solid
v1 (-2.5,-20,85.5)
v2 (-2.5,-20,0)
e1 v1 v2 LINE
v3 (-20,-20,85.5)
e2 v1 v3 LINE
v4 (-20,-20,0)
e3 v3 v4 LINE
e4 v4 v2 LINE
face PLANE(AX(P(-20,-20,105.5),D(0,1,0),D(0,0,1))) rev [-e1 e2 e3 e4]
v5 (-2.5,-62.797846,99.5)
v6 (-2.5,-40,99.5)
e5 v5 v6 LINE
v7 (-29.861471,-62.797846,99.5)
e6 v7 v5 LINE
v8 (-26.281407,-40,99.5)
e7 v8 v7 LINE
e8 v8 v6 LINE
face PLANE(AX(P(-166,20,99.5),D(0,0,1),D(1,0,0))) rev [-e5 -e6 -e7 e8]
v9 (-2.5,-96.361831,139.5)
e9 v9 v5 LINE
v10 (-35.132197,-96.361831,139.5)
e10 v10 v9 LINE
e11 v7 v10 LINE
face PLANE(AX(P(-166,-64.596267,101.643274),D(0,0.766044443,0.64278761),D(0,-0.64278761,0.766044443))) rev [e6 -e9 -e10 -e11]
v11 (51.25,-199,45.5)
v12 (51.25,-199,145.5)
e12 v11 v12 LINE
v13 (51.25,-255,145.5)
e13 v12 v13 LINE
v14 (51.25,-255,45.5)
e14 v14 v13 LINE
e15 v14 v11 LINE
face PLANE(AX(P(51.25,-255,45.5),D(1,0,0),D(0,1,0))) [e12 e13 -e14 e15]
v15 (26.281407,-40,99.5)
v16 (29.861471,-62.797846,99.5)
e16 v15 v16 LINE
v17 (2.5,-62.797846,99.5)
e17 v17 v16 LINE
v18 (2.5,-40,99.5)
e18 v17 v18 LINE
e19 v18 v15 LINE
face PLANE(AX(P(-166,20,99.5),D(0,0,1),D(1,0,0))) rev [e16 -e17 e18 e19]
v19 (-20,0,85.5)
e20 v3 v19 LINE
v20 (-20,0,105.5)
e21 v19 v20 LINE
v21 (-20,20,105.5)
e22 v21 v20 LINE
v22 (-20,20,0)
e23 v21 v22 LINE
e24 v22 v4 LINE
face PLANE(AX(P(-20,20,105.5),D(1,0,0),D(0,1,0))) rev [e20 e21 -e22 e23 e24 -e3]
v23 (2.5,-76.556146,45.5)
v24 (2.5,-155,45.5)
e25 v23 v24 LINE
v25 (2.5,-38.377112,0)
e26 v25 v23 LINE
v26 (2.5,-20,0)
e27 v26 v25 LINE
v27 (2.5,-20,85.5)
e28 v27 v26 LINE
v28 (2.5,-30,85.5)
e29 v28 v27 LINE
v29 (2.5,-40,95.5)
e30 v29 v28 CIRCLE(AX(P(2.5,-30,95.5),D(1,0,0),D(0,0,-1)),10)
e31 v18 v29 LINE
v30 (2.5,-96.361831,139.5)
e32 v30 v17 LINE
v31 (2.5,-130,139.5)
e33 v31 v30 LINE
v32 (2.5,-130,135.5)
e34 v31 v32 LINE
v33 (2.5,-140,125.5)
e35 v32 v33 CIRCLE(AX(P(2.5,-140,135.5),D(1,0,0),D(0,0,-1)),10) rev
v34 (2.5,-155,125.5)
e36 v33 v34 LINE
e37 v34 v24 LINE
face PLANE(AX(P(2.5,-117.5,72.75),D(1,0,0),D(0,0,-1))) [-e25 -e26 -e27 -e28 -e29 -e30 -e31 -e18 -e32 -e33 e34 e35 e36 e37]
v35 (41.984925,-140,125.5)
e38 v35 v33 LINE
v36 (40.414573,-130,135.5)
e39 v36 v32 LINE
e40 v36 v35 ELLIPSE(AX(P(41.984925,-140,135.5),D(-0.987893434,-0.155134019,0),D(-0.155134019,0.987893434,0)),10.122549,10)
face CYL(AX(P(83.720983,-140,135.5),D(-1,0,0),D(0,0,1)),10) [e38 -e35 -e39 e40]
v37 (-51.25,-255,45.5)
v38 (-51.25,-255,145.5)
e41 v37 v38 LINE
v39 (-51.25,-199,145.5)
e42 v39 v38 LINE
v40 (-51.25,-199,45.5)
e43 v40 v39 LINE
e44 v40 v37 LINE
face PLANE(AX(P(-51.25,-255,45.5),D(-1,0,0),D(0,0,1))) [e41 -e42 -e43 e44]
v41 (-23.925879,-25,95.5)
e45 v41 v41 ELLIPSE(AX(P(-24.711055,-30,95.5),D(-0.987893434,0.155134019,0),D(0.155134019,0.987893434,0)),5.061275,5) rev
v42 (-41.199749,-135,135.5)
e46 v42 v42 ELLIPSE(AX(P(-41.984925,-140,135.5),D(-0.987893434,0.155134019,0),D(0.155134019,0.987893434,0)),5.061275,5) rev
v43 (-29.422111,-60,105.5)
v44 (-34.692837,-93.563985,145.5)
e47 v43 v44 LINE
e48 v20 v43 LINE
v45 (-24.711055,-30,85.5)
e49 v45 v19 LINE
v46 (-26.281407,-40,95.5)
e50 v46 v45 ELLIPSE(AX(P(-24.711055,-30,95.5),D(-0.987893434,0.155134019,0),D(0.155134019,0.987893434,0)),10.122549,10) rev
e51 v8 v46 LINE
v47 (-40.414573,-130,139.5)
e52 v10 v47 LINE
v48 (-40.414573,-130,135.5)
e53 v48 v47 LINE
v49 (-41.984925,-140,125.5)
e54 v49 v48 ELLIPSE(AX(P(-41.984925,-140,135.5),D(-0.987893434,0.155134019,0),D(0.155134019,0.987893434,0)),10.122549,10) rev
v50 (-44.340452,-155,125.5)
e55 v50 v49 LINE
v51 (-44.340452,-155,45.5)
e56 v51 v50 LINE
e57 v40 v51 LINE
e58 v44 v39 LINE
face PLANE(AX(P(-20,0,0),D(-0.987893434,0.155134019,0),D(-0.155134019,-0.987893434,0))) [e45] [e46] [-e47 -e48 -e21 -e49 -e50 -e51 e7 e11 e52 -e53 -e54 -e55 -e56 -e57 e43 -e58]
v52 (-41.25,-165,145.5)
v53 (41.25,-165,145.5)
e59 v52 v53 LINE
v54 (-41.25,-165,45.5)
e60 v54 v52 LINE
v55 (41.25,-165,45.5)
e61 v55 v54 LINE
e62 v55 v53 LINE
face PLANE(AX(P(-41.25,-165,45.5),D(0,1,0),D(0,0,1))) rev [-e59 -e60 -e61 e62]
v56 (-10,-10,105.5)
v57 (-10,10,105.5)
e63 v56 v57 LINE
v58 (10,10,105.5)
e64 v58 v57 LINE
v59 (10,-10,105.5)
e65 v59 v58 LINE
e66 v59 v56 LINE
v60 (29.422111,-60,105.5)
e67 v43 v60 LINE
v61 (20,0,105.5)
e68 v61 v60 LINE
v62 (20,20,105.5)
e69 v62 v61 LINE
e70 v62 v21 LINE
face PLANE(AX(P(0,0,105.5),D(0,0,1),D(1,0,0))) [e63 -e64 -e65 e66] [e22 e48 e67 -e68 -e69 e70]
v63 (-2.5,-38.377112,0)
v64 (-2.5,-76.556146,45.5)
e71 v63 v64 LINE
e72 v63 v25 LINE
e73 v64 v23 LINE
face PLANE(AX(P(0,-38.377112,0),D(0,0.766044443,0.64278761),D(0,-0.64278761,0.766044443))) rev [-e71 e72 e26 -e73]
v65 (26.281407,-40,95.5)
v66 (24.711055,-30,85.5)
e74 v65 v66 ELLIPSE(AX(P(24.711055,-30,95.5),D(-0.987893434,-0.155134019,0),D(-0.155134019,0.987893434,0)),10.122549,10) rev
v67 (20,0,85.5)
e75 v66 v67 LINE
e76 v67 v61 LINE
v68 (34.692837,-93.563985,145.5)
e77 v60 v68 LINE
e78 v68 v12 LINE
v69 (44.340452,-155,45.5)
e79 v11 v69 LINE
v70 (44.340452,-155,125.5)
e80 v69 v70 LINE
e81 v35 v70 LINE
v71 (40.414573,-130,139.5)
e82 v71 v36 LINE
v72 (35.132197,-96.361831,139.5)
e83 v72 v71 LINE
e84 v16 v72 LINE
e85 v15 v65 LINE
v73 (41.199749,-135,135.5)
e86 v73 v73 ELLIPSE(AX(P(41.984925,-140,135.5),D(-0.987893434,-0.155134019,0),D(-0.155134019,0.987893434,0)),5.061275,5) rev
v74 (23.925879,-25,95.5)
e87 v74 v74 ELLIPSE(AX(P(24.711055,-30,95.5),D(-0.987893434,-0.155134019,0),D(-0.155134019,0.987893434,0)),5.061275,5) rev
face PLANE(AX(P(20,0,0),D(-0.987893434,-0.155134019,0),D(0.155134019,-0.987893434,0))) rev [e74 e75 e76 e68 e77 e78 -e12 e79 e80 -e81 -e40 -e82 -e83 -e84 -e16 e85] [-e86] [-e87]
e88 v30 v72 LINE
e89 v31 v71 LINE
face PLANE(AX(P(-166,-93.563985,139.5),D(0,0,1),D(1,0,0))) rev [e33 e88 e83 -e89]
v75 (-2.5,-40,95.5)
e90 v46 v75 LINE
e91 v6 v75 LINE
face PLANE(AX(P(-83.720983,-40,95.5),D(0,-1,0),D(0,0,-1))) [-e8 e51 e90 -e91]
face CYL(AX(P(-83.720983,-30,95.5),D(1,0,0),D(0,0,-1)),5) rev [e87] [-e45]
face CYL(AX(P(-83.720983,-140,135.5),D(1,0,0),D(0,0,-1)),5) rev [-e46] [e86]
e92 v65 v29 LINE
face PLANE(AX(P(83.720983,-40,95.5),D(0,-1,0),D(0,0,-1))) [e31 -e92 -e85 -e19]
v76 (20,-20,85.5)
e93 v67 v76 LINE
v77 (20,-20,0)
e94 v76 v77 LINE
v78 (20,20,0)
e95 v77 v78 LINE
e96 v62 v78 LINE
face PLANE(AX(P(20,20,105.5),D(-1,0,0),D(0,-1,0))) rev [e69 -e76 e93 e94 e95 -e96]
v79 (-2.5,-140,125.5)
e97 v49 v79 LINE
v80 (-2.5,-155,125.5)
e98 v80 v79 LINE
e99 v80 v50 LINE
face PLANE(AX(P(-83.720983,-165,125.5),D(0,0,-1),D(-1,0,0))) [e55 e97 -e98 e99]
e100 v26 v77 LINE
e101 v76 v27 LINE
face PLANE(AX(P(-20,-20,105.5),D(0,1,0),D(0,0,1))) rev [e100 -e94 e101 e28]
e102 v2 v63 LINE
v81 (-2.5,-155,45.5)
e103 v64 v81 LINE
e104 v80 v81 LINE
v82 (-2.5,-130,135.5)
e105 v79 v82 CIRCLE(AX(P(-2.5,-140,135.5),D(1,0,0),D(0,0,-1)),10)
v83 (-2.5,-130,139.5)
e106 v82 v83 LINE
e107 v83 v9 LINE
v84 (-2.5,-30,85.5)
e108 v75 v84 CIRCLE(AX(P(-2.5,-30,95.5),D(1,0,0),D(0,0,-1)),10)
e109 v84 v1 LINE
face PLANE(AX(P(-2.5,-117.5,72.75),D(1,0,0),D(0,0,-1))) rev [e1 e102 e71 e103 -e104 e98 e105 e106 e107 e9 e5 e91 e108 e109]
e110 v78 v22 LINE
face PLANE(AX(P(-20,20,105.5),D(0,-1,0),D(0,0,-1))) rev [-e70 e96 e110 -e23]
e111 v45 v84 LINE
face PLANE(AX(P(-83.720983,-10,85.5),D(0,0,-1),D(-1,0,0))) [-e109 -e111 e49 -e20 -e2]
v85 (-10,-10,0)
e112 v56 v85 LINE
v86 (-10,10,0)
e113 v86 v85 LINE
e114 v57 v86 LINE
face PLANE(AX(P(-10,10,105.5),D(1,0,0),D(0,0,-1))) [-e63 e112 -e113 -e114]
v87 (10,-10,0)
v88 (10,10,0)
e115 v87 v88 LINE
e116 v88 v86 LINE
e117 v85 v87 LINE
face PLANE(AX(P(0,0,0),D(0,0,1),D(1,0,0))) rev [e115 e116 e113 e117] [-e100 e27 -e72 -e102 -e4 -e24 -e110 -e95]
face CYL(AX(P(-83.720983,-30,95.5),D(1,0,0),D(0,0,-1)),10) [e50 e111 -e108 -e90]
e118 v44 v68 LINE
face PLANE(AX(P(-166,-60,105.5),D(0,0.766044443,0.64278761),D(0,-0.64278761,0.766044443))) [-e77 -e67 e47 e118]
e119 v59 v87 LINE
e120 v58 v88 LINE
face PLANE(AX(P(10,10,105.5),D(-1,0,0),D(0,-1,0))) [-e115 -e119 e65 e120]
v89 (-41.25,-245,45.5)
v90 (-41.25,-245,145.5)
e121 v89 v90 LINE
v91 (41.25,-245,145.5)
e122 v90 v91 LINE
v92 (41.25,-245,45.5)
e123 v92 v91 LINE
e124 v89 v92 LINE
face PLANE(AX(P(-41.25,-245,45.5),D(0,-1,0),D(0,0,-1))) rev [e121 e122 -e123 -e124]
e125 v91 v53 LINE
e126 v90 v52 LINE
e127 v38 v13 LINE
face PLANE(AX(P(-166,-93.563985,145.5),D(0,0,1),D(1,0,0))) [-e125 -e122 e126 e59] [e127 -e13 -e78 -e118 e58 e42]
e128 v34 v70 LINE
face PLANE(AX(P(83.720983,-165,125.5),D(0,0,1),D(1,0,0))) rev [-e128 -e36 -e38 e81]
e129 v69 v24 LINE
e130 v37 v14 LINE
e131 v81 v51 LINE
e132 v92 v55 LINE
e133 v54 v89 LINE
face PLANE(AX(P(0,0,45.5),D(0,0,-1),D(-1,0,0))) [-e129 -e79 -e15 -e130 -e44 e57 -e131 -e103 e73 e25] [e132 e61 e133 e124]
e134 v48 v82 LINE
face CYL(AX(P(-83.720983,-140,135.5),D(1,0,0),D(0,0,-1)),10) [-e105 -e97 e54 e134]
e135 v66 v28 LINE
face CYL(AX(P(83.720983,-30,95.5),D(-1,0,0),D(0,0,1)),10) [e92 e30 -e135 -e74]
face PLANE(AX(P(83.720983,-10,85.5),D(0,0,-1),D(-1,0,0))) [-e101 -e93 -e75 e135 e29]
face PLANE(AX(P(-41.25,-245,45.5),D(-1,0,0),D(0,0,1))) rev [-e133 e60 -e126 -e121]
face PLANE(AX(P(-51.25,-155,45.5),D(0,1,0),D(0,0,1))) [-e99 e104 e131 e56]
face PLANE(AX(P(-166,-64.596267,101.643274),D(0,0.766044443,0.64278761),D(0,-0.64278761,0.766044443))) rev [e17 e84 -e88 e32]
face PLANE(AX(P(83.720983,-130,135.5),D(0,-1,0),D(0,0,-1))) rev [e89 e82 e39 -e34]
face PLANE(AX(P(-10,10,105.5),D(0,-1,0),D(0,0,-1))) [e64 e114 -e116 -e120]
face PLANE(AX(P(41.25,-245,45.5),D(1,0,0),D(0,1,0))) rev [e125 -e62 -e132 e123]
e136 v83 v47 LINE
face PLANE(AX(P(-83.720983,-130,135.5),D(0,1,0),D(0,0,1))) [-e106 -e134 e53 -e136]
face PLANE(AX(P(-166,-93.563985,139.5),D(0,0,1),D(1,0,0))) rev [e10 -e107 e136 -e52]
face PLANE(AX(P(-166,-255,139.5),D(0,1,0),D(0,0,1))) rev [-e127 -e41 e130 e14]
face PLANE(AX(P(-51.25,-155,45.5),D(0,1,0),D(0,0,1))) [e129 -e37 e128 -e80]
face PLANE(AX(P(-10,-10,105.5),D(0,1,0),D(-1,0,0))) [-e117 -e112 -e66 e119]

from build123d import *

# Parameters (mm, degrees)
SKETCH1_W                = 40
SKETCH1_H                = 40
SKETCH1_W_2              = 20
SKETCH1_H_2              = 20
BOSS_EXTRUDE1_DEPTH      = 105.5
SKETCH2_W                = 102.5
SKETCH2_H                = 100
SKETCH2_W_2              = 82.5
SKETCH2_H_2              = 80
BOSS_EXTRUDE2_DEPTH      = 100
EXTRUDE_THIN1_DEPTH      = 158
EXTRUDE_THIN1_DEPTH_BACK = 166
RIB8_START               = -2.5
RIB8_DEPTH               = 5
CUT_EXTRUDE2_DEPTH       = 338.270292199
SKETCH2_2_W              = 82.5
SKETCH2_2_H              = 80
CUT_EXTRUDE3_DEPTH       = 299.029885246
SKETCH1_2_W              = 20
SKETCH1_2_H              = 20
CUT_EXTRUDE4_DEPTH       = 299.029885246
BOSS_EXTRUDE3_REACH      = 300.03
SKETCH7_R                = 5
BOSS_EXTRUDE4_REACH      = 300.03
CUT_EXTRUDE6_DEPTH       = 299.029885246
CUT_EXTRUDE6_DEPTH_BACK  = 299.029885246
SKETCH7_4_R              = 5
BOSS_EXTRUDE5_DEPTH      = 14


# Read off the part's stored shape, not the designer's step: Rib8
with BuildPart() as part:
    # Sketch1 → Boss-Extrude1 (new body)
    with BuildSketch(Plane.XY):
        Rectangle(SKETCH1_W, SKETCH1_H)
        Rectangle(SKETCH1_W_2, SKETCH1_H_2, mode=Mode.SUBTRACT)
    extrude(amount=BOSS_EXTRUDE1_DEPTH)



with BuildPart() as body_2:
    # Sketch2 → Boss-Extrude2 (new body)
    with BuildSketch(Plane.XY.offset(145.5)):
        with Locations((0, -205)):
            Rectangle(SKETCH2_W, SKETCH2_H)
        with Locations((0, -205)):
            Rectangle(SKETCH2_W_2, SKETCH2_H_2, mode=Mode.SUBTRACT)
    extrude(amount=-BOSS_EXTRUDE2_DEPTH)


with BuildPart() as part_1:
    add(part.part)

    add(body_2.part)  # Extrude-Thin1 merges body 2
    # Sketch3 → Extrude-Thin1 (add, two sides: drawn at the far end of the back side and taken through both)
    with BuildSketch(Plane(origin=(0, 0, 0), x_dir=(0, 0, -1), z_dir=(1, 0, 0)).offset(-EXTRUDE_THIN1_DEPTH_BACK)):
        Polygon((-105.5, 20), (-105.5, 0), (-105.5, -60), (-145.5, -93.563985247), (-145.5, -255), (-139.5, -255), (-139.5, -96.361831196), (-99.5, -62.797845949), (-99.5, 0), (-99.5, 20), align=None)
    extrude(amount=EXTRUDE_THIN1_DEPTH + EXTRUDE_THIN1_DEPTH_BACK)

    # Rib8 outline → Rib8 (add)
    with BuildSketch(Plane.YZ.offset(RIB8_START)):
        Polygon((-38.377112489, 0), (-20, 0), (-20, 99.5), (-62.797845949, 99.5), (-96.361831196, 139.5), (-155, 139.5), (-155, 45.5), (-76.556145708, 45.5), align=None)
    extrude(amount=RIB8_DEPTH)

    # Sketch6 → Cut-Extrude2 (cut, through all)
    with BuildSketch(Plane.XY.offset(145.5)):
        Polygon((20, 20), (20, 0), (51.25, -199), (51.25, -255), (158, -255), (158, 20), align=None)
        Polygon((-51.25, -255), (-158, -255), (-166, -255), (-166, 20), (-158, 20), (-20, 20), (-20, 0), (-51.25, -199), align=None)
    extrude(amount=-CUT_EXTRUDE2_DEPTH, mode=Mode.SUBTRACT)

    # Sketch2<2> → Cut-Extrude3 (cut, through all)
    with BuildSketch(Plane.XY.offset(145.5)):
        with Locations((0, -205)):
            Rectangle(SKETCH2_2_W, SKETCH2_2_H)
    extrude(amount=-CUT_EXTRUDE3_DEPTH, mode=Mode.SUBTRACT)

    # Sketch1<2> → Cut-Extrude4 (cut, through all)
    with BuildSketch(Plane.XY):
        Rectangle(SKETCH1_2_W, SKETCH1_2_H)
    extrude(amount=CUT_EXTRUDE4_DEPTH, mode=Mode.SUBTRACT)

    # Boss-Extrude3: up to this plane
    boss_extrude3_end = Plane(origin=(-20, 0, 0), z_dir=(-0.9878934335848292, 0.15513401909309493, 0))
    # Sketch7 → Boss-Extrude3 (add, up to the surface)
    with BuildSketch(Plane(origin=(0, 0, 0), x_dir=(0, 0, -1), z_dir=(1, 0, 0)), mode=Mode.PRIVATE) as boss_extrude3_sk1:
        with BuildLine():
            Line((-145.5, -165), (-125.5, -165))
            Line((-125.5, -165), (-125.5, -140))
            ThreePointArc((-125.5, -140), (-128.428932188, -132.928932188), (-135.5, -130))
            Line((-135.5, -130), (-145.5, -130))
            Line((-145.5, -130), (-145.5, -165))
        make_face()
        with Locations((-135.5, -140)):
            Circle(SKETCH7_R, mode=Mode.SUBTRACT)
    boss_extrude3_tool1 = split(extrude(boss_extrude3_sk1.sketch, amount=-BOSS_EXTRUDE3_REACH, mode=Mode.PRIVATE), bisect_by=boss_extrude3_end, keep=Keep.BOTH, mode=Mode.PRIVATE)
    add(boss_extrude3_tool1.solids().sort_by_distance((0, -149.027778, 135.777778))[0])
    # Sketch7 → Boss-Extrude3 (add, up to the surface)
    with BuildSketch(Plane(origin=(0, 0, 0), x_dir=(0, 0, -1), z_dir=(1, 0, 0)), mode=Mode.PRIVATE) as boss_extrude3_sk2:
        with BuildLine():
            Line((-105.5, -10), (-85.5, -10))
            Line((-85.5, -10), (-85.5, -30))
            ThreePointArc((-85.5, -30), (-88.428932188, -37.071067812), (-95.5, -40))
            Line((-95.5, -40), (-105.5, -40))
            Line((-105.5, -40), (-105.5, -10))
        make_face()
        with Locations((-95.5, -30)):
            Circle(SKETCH7_R, mode=Mode.SUBTRACT)
    boss_extrude3_tool2 = split(extrude(boss_extrude3_sk2.sketch, amount=-BOSS_EXTRUDE3_REACH, mode=Mode.PRIVATE), bisect_by=boss_extrude3_end, keep=Keep.BOTH, mode=Mode.PRIVATE)
    add(boss_extrude3_tool2.solids().sort_by_distance((0, -23.666667, 95.833333))[0])

    # Boss-Extrude4: up to this plane
    boss_extrude4_end = Plane(origin=(20, 0, 0), z_dir=(-0.9878934335848292, -0.15513401909309524, 0))
    # Sketch7<2> → Boss-Extrude4 (add, up to the surface)
    with BuildSketch(Plane(origin=(0, 0, 0), x_dir=(0, 0, -1), z_dir=(1, 0, 0)), mode=Mode.PRIVATE) as boss_extrude4_sk1:
        with BuildLine():
            Line((-145.5, -165), (-125.5, -165))
            Line((-125.5, -165), (-125.5, -140))
            ThreePointArc((-125.5, -140), (-128.428932188, -132.928932188), (-135.5, -130))
            Line((-135.5, -130), (-145.5, -130))
            Line((-145.5, -130), (-145.5, -165))
        make_face()
    boss_extrude4_tool1 = split(extrude(boss_extrude4_sk1.sketch, amount=BOSS_EXTRUDE4_REACH, mode=Mode.PRIVATE), bisect_by=boss_extrude4_end, keep=Keep.BOTH, mode=Mode.PRIVATE)
    add(boss_extrude4_tool1.solids().sort_by_distance((0, -147.982828, 135.745625))[0])
    # Sketch7<2> → Boss-Extrude4 (add, up to the surface)
    with BuildSketch(Plane(origin=(0, 0, 0), x_dir=(0, 0, -1), z_dir=(1, 0, 0)), mode=Mode.PRIVATE) as boss_extrude4_sk2:
        with BuildLine():
            Line((-105.5, -10), (-85.5, -10))
            Line((-85.5, -10), (-85.5, -30))
            ThreePointArc((-85.5, -30), (-88.428932188, -37.071067812), (-95.5, -40))
            Line((-95.5, -40), (-105.5, -40))
            Line((-105.5, -40), (-105.5, -10))
        make_face()
    boss_extrude4_tool2 = split(extrude(boss_extrude4_sk2.sketch, amount=BOSS_EXTRUDE4_REACH, mode=Mode.PRIVATE), bisect_by=boss_extrude4_end, keep=Keep.BOTH, mode=Mode.PRIVATE)
    add(boss_extrude4_tool2.solids().sort_by_distance((0, -24.52645, 95.788082))[0])

    # Sketch7<4> → Cut-Extrude6 (cut, two sides: drawn at the far end of the back side and taken through both)
    with BuildSketch(Plane(origin=(0, 0, 0), x_dir=(0, 0, -1), z_dir=(1, 0, 0)).offset(-CUT_EXTRUDE6_DEPTH_BACK)):
        with Locations(Location((-135.5, -140, 0), (0, 0, 90))):
            Circle(SKETCH7_4_R)
        with Locations(Location((-95.5, -30, 0), (0, 0, 90))):
            Circle(SKETCH7_4_R)
    extrude(amount=CUT_EXTRUDE6_DEPTH + CUT_EXTRUDE6_DEPTH_BACK, mode=Mode.SUBTRACT)

    # Sketch8 → Boss-Extrude5 (add)
    with BuildSketch(Plane(origin=(0, 0, 99.5), x_dir=(-1, 0, 0), z_dir=(0, 0, -1))):
        Polygon((20, 0), (20, -10), (21.570351759, -10), align=None)
        Polygon((-20, 0), (-21.570351759, -10), (-20, -10), align=None)
    extrude(amount=BOSS_EXTRUDE5_DEPTH)


solid = part_1.part
